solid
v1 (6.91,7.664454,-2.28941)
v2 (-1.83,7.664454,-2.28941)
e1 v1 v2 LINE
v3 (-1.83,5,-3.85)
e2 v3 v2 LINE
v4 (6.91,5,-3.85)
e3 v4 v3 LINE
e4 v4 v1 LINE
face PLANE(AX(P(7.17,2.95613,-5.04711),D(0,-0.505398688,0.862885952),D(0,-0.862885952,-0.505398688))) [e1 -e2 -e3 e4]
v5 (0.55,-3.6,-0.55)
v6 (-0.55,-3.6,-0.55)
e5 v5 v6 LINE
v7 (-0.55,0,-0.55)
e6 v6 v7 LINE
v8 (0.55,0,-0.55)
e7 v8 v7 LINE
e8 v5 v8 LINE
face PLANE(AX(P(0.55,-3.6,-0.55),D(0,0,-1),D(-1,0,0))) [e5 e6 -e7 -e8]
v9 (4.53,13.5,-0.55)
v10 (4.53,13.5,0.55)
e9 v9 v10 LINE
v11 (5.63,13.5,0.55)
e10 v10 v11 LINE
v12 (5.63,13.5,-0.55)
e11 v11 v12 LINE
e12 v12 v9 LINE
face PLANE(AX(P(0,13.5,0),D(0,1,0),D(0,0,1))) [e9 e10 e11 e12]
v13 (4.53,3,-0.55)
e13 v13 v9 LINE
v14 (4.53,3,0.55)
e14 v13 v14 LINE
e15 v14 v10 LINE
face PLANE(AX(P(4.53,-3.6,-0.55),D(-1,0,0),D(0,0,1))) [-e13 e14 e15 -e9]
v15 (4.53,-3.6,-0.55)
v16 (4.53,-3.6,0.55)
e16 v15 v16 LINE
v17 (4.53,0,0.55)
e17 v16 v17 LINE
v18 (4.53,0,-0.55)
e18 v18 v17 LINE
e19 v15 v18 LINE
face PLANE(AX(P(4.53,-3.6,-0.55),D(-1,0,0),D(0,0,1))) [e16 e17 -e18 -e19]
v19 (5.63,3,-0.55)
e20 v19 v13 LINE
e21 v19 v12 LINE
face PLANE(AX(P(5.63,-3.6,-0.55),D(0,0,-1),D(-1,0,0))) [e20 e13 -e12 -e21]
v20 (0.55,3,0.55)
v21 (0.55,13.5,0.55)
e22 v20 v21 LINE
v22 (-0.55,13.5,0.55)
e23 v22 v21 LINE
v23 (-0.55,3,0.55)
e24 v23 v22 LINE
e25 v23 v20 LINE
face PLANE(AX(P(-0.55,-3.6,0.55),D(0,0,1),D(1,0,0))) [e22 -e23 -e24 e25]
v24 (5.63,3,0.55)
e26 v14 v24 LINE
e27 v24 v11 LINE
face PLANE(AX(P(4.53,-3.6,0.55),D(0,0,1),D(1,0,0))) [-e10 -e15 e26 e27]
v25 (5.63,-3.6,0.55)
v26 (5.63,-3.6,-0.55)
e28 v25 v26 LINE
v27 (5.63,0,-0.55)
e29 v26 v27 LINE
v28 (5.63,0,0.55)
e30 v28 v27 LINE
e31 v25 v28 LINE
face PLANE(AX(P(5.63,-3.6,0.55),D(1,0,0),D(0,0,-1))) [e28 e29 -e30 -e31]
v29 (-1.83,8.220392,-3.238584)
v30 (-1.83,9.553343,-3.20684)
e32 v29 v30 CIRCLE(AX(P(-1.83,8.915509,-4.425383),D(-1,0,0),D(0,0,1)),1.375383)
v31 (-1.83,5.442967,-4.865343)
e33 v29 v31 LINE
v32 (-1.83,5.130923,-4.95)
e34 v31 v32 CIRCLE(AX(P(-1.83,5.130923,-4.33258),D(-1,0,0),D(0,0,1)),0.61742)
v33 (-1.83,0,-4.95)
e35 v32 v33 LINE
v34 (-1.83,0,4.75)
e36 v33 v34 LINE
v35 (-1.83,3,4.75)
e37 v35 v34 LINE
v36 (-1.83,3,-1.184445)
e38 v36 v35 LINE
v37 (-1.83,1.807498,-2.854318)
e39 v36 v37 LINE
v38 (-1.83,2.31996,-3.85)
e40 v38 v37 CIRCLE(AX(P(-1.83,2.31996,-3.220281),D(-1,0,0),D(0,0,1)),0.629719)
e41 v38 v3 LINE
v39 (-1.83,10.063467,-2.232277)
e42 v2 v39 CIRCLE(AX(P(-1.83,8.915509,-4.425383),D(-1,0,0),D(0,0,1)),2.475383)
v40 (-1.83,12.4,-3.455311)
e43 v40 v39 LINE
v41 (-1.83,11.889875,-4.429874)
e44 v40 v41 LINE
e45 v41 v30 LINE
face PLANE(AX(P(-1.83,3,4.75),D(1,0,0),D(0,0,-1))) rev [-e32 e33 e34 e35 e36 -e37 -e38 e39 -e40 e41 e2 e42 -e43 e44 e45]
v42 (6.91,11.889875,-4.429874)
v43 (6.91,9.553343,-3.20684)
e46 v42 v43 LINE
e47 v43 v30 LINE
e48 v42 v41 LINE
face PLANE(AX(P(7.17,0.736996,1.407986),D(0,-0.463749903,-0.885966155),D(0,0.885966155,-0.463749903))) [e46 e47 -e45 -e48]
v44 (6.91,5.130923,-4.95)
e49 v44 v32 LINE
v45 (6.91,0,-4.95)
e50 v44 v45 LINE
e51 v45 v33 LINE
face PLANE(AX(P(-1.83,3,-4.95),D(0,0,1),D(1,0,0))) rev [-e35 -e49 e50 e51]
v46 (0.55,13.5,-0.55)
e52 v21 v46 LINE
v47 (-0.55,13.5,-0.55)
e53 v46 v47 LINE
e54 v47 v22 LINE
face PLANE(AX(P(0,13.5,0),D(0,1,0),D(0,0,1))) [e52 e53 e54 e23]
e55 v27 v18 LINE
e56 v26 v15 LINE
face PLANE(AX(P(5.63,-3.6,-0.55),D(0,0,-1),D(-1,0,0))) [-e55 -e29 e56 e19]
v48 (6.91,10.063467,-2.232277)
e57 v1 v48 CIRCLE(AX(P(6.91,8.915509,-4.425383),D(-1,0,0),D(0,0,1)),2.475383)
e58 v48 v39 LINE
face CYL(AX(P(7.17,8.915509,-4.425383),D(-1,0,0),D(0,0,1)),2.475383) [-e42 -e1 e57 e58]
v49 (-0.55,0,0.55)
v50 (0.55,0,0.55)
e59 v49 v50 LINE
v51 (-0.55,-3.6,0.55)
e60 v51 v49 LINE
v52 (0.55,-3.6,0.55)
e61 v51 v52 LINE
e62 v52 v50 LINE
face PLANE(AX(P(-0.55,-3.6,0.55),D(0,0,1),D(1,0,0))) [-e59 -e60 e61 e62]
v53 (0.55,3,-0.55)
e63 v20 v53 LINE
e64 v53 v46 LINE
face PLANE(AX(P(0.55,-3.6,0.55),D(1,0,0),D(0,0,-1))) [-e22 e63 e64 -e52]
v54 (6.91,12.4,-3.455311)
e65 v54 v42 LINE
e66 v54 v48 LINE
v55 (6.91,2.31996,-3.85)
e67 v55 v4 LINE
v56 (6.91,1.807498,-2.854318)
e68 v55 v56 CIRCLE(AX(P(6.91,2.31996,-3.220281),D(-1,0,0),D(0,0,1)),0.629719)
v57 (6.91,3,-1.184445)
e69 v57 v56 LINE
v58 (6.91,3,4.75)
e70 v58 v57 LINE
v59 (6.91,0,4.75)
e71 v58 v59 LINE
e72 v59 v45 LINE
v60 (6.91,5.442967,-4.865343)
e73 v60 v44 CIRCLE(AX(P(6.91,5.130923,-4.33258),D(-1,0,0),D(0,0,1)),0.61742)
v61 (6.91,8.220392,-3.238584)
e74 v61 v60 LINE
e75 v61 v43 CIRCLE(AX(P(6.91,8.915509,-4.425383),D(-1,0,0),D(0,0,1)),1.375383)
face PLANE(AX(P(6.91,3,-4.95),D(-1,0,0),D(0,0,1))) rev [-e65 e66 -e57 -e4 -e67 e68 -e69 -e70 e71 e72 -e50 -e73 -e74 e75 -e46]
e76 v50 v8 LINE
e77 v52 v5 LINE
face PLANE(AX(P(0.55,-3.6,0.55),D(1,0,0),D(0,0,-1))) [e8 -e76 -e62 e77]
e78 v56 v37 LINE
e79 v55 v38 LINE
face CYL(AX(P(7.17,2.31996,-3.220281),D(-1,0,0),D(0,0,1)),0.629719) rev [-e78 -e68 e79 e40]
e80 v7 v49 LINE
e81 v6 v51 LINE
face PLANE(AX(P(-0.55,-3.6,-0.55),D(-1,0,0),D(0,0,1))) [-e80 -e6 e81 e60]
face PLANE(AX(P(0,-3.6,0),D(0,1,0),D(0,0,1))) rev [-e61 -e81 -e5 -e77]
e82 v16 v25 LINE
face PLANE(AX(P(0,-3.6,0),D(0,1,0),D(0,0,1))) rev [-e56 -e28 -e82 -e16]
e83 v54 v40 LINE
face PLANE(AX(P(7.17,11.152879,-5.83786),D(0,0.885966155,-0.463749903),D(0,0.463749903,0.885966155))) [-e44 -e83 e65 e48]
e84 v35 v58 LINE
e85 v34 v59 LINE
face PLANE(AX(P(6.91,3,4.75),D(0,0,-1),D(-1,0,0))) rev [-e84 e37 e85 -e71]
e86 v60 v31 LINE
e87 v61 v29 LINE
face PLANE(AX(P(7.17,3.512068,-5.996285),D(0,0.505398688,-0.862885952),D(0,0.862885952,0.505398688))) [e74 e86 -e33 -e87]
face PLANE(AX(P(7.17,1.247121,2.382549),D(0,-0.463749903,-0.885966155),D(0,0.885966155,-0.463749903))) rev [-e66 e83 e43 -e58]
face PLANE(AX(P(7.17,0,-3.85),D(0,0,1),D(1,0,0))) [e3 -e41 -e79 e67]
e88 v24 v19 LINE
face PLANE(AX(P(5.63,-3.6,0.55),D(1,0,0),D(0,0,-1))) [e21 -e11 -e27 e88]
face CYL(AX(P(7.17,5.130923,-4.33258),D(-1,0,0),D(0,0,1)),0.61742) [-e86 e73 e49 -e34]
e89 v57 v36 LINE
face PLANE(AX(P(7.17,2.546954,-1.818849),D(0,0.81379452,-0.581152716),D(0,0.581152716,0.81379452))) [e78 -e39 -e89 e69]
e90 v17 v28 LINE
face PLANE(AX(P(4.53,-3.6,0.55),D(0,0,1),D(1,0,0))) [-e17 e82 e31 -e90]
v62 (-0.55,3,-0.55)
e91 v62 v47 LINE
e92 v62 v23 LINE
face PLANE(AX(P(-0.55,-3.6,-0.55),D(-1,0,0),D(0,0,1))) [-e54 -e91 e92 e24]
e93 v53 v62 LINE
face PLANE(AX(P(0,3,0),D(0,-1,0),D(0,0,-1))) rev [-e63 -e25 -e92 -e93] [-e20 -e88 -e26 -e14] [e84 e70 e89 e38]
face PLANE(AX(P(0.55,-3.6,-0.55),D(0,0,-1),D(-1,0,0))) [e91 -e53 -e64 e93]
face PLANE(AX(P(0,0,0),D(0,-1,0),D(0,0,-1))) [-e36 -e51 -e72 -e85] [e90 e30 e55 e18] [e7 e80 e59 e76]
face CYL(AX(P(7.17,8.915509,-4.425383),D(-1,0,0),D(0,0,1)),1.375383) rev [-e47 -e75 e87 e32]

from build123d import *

# Parameters (mm, degrees)
CROQUIS1_W                   = 8.74
CROQUIS1_H                   = 9.7
CROQUIS1_W_2                 = 1.1
CROQUIS1_H_2                 = 1.1
SALIENTE_EXTRUIR1_DEPTH      = 3
CROQUIS2_W                   = 8.74
CROQUIS2_H                   = 3
SALIENTE_EXTRUIR2_DEPTH      = 9.4
CORTAR_EXTRUIR1_DEPTH        = 9
SALIENTE_EXTRUIR3_DEPTH      = 13.5
SALIENTE_EXTRUIR3_DEPTH_BACK = 3.6
CROQUIS5_W                   = 1.1
CROQUIS5_H                   = 1.1


with BuildPart() as part:
    # Croquis1 → Saliente-Extruir1 (new body)
    with BuildSketch(Plane(origin=(0, 0, 0), x_dir=(1, 0, 0), z_dir=(0, 1, 0))):
        with Locations((2.54, 0.1)):
            Rectangle(CROQUIS1_W, CROQUIS1_H)
        Rectangle(CROQUIS1_W_2, CROQUIS1_H_2, mode=Mode.SUBTRACT)
        with Locations((5.08, 0)):
            Rectangle(CROQUIS1_W_2, CROQUIS1_H_2, mode=Mode.SUBTRACT)
    extrude(amount=SALIENTE_EXTRUIR1_DEPTH)

    # Croquis2 → Saliente-Extruir2 (add)
    with BuildSketch(Plane(origin=(0, 3, 0), x_dir=(1, 0, 0), z_dir=(0, 1, 0))):
        with Locations((2.54, 3.45)):
            Rectangle(CROQUIS2_W, CROQUIS2_H)
    extrude(amount=SALIENTE_EXTRUIR2_DEPTH)

    # Croquis3 → Cortar-Extruir1 (cut)
    with BuildSketch(Plane.ZY.offset(1.83)):
        with BuildLine():
            Line((-1.95, 3), (-1.95, 8.9155089))
            ThreePointArc((-1.95, 8.9155089), (-2.036358841, 8.267369623), (-2.28940975, 7.664453701))
            Line((-2.28940975, 7.664453701), (-3.85, 5))
            Line((-3.85, 5), (-3.85, 2.319959731))
            ThreePointArc((-3.85, 2.319959731), (-3.508458272, 1.760049187), (-2.854318236, 1.807497933))
            Line((-2.854318236, 1.807497933), (-1.184444515, 3))
            Line((-1.184444515, 3), (-1.95, 3))
        make_face()
        with BuildLine():
            Line((-1.95, 12.4), (-3.455311447, 12.4))
            Line((-3.455311447, 12.4), (-2.232277415, 10.063467416))
            ThreePointArc((-2.232277415, 10.063467416), (-2.021605007, 9.506586156), (-1.95, 8.9155089))
            Line((-1.95, 8.9155089), (-1.95, 12.4))
        make_face()
        with BuildLine():
            Line((-4.95, 12.4), (-4.95, 5.130923429))
            ThreePointArc((-4.95, 5.130923429), (-4.928460036, 5.292584893), (-4.865343077, 5.442966568))
            Line((-4.865343077, 5.442966568), (-3.238584298, 8.220392257))
            ThreePointArc((-3.238584298, 8.220392257), (-3.050389859, 8.882763545), (-3.206840185, 9.553342522))
            Line((-3.206840185, 9.553342522), (-4.429874218, 11.889875107))
            Line((-4.429874218, 11.889875107), (-3.455311447, 12.4))
            Line((-3.455311447, 12.4), (-4.95, 12.4))
        make_face()
    extrude(amount=-CORTAR_EXTRUIR1_DEPTH, mode=Mode.SUBTRACT)

    # Croquis5 → Saliente-Extruir3 (add, two sides: drawn at the far end of the back side and taken through both)
    with BuildSketch(Plane(origin=(0, 0, 0), x_dir=(1, 0, 0), z_dir=(0, 1, 0)).offset(-SALIENTE_EXTRUIR3_DEPTH_BACK)):
        with Locations((5.08, 0)):
            Rectangle(CROQUIS5_W, CROQUIS5_H)
        Rectangle(CROQUIS5_W, CROQUIS5_H)
    extrude(amount=SALIENTE_EXTRUIR3_DEPTH + SALIENTE_EXTRUIR3_DEPTH_BACK)


solid = part.part
